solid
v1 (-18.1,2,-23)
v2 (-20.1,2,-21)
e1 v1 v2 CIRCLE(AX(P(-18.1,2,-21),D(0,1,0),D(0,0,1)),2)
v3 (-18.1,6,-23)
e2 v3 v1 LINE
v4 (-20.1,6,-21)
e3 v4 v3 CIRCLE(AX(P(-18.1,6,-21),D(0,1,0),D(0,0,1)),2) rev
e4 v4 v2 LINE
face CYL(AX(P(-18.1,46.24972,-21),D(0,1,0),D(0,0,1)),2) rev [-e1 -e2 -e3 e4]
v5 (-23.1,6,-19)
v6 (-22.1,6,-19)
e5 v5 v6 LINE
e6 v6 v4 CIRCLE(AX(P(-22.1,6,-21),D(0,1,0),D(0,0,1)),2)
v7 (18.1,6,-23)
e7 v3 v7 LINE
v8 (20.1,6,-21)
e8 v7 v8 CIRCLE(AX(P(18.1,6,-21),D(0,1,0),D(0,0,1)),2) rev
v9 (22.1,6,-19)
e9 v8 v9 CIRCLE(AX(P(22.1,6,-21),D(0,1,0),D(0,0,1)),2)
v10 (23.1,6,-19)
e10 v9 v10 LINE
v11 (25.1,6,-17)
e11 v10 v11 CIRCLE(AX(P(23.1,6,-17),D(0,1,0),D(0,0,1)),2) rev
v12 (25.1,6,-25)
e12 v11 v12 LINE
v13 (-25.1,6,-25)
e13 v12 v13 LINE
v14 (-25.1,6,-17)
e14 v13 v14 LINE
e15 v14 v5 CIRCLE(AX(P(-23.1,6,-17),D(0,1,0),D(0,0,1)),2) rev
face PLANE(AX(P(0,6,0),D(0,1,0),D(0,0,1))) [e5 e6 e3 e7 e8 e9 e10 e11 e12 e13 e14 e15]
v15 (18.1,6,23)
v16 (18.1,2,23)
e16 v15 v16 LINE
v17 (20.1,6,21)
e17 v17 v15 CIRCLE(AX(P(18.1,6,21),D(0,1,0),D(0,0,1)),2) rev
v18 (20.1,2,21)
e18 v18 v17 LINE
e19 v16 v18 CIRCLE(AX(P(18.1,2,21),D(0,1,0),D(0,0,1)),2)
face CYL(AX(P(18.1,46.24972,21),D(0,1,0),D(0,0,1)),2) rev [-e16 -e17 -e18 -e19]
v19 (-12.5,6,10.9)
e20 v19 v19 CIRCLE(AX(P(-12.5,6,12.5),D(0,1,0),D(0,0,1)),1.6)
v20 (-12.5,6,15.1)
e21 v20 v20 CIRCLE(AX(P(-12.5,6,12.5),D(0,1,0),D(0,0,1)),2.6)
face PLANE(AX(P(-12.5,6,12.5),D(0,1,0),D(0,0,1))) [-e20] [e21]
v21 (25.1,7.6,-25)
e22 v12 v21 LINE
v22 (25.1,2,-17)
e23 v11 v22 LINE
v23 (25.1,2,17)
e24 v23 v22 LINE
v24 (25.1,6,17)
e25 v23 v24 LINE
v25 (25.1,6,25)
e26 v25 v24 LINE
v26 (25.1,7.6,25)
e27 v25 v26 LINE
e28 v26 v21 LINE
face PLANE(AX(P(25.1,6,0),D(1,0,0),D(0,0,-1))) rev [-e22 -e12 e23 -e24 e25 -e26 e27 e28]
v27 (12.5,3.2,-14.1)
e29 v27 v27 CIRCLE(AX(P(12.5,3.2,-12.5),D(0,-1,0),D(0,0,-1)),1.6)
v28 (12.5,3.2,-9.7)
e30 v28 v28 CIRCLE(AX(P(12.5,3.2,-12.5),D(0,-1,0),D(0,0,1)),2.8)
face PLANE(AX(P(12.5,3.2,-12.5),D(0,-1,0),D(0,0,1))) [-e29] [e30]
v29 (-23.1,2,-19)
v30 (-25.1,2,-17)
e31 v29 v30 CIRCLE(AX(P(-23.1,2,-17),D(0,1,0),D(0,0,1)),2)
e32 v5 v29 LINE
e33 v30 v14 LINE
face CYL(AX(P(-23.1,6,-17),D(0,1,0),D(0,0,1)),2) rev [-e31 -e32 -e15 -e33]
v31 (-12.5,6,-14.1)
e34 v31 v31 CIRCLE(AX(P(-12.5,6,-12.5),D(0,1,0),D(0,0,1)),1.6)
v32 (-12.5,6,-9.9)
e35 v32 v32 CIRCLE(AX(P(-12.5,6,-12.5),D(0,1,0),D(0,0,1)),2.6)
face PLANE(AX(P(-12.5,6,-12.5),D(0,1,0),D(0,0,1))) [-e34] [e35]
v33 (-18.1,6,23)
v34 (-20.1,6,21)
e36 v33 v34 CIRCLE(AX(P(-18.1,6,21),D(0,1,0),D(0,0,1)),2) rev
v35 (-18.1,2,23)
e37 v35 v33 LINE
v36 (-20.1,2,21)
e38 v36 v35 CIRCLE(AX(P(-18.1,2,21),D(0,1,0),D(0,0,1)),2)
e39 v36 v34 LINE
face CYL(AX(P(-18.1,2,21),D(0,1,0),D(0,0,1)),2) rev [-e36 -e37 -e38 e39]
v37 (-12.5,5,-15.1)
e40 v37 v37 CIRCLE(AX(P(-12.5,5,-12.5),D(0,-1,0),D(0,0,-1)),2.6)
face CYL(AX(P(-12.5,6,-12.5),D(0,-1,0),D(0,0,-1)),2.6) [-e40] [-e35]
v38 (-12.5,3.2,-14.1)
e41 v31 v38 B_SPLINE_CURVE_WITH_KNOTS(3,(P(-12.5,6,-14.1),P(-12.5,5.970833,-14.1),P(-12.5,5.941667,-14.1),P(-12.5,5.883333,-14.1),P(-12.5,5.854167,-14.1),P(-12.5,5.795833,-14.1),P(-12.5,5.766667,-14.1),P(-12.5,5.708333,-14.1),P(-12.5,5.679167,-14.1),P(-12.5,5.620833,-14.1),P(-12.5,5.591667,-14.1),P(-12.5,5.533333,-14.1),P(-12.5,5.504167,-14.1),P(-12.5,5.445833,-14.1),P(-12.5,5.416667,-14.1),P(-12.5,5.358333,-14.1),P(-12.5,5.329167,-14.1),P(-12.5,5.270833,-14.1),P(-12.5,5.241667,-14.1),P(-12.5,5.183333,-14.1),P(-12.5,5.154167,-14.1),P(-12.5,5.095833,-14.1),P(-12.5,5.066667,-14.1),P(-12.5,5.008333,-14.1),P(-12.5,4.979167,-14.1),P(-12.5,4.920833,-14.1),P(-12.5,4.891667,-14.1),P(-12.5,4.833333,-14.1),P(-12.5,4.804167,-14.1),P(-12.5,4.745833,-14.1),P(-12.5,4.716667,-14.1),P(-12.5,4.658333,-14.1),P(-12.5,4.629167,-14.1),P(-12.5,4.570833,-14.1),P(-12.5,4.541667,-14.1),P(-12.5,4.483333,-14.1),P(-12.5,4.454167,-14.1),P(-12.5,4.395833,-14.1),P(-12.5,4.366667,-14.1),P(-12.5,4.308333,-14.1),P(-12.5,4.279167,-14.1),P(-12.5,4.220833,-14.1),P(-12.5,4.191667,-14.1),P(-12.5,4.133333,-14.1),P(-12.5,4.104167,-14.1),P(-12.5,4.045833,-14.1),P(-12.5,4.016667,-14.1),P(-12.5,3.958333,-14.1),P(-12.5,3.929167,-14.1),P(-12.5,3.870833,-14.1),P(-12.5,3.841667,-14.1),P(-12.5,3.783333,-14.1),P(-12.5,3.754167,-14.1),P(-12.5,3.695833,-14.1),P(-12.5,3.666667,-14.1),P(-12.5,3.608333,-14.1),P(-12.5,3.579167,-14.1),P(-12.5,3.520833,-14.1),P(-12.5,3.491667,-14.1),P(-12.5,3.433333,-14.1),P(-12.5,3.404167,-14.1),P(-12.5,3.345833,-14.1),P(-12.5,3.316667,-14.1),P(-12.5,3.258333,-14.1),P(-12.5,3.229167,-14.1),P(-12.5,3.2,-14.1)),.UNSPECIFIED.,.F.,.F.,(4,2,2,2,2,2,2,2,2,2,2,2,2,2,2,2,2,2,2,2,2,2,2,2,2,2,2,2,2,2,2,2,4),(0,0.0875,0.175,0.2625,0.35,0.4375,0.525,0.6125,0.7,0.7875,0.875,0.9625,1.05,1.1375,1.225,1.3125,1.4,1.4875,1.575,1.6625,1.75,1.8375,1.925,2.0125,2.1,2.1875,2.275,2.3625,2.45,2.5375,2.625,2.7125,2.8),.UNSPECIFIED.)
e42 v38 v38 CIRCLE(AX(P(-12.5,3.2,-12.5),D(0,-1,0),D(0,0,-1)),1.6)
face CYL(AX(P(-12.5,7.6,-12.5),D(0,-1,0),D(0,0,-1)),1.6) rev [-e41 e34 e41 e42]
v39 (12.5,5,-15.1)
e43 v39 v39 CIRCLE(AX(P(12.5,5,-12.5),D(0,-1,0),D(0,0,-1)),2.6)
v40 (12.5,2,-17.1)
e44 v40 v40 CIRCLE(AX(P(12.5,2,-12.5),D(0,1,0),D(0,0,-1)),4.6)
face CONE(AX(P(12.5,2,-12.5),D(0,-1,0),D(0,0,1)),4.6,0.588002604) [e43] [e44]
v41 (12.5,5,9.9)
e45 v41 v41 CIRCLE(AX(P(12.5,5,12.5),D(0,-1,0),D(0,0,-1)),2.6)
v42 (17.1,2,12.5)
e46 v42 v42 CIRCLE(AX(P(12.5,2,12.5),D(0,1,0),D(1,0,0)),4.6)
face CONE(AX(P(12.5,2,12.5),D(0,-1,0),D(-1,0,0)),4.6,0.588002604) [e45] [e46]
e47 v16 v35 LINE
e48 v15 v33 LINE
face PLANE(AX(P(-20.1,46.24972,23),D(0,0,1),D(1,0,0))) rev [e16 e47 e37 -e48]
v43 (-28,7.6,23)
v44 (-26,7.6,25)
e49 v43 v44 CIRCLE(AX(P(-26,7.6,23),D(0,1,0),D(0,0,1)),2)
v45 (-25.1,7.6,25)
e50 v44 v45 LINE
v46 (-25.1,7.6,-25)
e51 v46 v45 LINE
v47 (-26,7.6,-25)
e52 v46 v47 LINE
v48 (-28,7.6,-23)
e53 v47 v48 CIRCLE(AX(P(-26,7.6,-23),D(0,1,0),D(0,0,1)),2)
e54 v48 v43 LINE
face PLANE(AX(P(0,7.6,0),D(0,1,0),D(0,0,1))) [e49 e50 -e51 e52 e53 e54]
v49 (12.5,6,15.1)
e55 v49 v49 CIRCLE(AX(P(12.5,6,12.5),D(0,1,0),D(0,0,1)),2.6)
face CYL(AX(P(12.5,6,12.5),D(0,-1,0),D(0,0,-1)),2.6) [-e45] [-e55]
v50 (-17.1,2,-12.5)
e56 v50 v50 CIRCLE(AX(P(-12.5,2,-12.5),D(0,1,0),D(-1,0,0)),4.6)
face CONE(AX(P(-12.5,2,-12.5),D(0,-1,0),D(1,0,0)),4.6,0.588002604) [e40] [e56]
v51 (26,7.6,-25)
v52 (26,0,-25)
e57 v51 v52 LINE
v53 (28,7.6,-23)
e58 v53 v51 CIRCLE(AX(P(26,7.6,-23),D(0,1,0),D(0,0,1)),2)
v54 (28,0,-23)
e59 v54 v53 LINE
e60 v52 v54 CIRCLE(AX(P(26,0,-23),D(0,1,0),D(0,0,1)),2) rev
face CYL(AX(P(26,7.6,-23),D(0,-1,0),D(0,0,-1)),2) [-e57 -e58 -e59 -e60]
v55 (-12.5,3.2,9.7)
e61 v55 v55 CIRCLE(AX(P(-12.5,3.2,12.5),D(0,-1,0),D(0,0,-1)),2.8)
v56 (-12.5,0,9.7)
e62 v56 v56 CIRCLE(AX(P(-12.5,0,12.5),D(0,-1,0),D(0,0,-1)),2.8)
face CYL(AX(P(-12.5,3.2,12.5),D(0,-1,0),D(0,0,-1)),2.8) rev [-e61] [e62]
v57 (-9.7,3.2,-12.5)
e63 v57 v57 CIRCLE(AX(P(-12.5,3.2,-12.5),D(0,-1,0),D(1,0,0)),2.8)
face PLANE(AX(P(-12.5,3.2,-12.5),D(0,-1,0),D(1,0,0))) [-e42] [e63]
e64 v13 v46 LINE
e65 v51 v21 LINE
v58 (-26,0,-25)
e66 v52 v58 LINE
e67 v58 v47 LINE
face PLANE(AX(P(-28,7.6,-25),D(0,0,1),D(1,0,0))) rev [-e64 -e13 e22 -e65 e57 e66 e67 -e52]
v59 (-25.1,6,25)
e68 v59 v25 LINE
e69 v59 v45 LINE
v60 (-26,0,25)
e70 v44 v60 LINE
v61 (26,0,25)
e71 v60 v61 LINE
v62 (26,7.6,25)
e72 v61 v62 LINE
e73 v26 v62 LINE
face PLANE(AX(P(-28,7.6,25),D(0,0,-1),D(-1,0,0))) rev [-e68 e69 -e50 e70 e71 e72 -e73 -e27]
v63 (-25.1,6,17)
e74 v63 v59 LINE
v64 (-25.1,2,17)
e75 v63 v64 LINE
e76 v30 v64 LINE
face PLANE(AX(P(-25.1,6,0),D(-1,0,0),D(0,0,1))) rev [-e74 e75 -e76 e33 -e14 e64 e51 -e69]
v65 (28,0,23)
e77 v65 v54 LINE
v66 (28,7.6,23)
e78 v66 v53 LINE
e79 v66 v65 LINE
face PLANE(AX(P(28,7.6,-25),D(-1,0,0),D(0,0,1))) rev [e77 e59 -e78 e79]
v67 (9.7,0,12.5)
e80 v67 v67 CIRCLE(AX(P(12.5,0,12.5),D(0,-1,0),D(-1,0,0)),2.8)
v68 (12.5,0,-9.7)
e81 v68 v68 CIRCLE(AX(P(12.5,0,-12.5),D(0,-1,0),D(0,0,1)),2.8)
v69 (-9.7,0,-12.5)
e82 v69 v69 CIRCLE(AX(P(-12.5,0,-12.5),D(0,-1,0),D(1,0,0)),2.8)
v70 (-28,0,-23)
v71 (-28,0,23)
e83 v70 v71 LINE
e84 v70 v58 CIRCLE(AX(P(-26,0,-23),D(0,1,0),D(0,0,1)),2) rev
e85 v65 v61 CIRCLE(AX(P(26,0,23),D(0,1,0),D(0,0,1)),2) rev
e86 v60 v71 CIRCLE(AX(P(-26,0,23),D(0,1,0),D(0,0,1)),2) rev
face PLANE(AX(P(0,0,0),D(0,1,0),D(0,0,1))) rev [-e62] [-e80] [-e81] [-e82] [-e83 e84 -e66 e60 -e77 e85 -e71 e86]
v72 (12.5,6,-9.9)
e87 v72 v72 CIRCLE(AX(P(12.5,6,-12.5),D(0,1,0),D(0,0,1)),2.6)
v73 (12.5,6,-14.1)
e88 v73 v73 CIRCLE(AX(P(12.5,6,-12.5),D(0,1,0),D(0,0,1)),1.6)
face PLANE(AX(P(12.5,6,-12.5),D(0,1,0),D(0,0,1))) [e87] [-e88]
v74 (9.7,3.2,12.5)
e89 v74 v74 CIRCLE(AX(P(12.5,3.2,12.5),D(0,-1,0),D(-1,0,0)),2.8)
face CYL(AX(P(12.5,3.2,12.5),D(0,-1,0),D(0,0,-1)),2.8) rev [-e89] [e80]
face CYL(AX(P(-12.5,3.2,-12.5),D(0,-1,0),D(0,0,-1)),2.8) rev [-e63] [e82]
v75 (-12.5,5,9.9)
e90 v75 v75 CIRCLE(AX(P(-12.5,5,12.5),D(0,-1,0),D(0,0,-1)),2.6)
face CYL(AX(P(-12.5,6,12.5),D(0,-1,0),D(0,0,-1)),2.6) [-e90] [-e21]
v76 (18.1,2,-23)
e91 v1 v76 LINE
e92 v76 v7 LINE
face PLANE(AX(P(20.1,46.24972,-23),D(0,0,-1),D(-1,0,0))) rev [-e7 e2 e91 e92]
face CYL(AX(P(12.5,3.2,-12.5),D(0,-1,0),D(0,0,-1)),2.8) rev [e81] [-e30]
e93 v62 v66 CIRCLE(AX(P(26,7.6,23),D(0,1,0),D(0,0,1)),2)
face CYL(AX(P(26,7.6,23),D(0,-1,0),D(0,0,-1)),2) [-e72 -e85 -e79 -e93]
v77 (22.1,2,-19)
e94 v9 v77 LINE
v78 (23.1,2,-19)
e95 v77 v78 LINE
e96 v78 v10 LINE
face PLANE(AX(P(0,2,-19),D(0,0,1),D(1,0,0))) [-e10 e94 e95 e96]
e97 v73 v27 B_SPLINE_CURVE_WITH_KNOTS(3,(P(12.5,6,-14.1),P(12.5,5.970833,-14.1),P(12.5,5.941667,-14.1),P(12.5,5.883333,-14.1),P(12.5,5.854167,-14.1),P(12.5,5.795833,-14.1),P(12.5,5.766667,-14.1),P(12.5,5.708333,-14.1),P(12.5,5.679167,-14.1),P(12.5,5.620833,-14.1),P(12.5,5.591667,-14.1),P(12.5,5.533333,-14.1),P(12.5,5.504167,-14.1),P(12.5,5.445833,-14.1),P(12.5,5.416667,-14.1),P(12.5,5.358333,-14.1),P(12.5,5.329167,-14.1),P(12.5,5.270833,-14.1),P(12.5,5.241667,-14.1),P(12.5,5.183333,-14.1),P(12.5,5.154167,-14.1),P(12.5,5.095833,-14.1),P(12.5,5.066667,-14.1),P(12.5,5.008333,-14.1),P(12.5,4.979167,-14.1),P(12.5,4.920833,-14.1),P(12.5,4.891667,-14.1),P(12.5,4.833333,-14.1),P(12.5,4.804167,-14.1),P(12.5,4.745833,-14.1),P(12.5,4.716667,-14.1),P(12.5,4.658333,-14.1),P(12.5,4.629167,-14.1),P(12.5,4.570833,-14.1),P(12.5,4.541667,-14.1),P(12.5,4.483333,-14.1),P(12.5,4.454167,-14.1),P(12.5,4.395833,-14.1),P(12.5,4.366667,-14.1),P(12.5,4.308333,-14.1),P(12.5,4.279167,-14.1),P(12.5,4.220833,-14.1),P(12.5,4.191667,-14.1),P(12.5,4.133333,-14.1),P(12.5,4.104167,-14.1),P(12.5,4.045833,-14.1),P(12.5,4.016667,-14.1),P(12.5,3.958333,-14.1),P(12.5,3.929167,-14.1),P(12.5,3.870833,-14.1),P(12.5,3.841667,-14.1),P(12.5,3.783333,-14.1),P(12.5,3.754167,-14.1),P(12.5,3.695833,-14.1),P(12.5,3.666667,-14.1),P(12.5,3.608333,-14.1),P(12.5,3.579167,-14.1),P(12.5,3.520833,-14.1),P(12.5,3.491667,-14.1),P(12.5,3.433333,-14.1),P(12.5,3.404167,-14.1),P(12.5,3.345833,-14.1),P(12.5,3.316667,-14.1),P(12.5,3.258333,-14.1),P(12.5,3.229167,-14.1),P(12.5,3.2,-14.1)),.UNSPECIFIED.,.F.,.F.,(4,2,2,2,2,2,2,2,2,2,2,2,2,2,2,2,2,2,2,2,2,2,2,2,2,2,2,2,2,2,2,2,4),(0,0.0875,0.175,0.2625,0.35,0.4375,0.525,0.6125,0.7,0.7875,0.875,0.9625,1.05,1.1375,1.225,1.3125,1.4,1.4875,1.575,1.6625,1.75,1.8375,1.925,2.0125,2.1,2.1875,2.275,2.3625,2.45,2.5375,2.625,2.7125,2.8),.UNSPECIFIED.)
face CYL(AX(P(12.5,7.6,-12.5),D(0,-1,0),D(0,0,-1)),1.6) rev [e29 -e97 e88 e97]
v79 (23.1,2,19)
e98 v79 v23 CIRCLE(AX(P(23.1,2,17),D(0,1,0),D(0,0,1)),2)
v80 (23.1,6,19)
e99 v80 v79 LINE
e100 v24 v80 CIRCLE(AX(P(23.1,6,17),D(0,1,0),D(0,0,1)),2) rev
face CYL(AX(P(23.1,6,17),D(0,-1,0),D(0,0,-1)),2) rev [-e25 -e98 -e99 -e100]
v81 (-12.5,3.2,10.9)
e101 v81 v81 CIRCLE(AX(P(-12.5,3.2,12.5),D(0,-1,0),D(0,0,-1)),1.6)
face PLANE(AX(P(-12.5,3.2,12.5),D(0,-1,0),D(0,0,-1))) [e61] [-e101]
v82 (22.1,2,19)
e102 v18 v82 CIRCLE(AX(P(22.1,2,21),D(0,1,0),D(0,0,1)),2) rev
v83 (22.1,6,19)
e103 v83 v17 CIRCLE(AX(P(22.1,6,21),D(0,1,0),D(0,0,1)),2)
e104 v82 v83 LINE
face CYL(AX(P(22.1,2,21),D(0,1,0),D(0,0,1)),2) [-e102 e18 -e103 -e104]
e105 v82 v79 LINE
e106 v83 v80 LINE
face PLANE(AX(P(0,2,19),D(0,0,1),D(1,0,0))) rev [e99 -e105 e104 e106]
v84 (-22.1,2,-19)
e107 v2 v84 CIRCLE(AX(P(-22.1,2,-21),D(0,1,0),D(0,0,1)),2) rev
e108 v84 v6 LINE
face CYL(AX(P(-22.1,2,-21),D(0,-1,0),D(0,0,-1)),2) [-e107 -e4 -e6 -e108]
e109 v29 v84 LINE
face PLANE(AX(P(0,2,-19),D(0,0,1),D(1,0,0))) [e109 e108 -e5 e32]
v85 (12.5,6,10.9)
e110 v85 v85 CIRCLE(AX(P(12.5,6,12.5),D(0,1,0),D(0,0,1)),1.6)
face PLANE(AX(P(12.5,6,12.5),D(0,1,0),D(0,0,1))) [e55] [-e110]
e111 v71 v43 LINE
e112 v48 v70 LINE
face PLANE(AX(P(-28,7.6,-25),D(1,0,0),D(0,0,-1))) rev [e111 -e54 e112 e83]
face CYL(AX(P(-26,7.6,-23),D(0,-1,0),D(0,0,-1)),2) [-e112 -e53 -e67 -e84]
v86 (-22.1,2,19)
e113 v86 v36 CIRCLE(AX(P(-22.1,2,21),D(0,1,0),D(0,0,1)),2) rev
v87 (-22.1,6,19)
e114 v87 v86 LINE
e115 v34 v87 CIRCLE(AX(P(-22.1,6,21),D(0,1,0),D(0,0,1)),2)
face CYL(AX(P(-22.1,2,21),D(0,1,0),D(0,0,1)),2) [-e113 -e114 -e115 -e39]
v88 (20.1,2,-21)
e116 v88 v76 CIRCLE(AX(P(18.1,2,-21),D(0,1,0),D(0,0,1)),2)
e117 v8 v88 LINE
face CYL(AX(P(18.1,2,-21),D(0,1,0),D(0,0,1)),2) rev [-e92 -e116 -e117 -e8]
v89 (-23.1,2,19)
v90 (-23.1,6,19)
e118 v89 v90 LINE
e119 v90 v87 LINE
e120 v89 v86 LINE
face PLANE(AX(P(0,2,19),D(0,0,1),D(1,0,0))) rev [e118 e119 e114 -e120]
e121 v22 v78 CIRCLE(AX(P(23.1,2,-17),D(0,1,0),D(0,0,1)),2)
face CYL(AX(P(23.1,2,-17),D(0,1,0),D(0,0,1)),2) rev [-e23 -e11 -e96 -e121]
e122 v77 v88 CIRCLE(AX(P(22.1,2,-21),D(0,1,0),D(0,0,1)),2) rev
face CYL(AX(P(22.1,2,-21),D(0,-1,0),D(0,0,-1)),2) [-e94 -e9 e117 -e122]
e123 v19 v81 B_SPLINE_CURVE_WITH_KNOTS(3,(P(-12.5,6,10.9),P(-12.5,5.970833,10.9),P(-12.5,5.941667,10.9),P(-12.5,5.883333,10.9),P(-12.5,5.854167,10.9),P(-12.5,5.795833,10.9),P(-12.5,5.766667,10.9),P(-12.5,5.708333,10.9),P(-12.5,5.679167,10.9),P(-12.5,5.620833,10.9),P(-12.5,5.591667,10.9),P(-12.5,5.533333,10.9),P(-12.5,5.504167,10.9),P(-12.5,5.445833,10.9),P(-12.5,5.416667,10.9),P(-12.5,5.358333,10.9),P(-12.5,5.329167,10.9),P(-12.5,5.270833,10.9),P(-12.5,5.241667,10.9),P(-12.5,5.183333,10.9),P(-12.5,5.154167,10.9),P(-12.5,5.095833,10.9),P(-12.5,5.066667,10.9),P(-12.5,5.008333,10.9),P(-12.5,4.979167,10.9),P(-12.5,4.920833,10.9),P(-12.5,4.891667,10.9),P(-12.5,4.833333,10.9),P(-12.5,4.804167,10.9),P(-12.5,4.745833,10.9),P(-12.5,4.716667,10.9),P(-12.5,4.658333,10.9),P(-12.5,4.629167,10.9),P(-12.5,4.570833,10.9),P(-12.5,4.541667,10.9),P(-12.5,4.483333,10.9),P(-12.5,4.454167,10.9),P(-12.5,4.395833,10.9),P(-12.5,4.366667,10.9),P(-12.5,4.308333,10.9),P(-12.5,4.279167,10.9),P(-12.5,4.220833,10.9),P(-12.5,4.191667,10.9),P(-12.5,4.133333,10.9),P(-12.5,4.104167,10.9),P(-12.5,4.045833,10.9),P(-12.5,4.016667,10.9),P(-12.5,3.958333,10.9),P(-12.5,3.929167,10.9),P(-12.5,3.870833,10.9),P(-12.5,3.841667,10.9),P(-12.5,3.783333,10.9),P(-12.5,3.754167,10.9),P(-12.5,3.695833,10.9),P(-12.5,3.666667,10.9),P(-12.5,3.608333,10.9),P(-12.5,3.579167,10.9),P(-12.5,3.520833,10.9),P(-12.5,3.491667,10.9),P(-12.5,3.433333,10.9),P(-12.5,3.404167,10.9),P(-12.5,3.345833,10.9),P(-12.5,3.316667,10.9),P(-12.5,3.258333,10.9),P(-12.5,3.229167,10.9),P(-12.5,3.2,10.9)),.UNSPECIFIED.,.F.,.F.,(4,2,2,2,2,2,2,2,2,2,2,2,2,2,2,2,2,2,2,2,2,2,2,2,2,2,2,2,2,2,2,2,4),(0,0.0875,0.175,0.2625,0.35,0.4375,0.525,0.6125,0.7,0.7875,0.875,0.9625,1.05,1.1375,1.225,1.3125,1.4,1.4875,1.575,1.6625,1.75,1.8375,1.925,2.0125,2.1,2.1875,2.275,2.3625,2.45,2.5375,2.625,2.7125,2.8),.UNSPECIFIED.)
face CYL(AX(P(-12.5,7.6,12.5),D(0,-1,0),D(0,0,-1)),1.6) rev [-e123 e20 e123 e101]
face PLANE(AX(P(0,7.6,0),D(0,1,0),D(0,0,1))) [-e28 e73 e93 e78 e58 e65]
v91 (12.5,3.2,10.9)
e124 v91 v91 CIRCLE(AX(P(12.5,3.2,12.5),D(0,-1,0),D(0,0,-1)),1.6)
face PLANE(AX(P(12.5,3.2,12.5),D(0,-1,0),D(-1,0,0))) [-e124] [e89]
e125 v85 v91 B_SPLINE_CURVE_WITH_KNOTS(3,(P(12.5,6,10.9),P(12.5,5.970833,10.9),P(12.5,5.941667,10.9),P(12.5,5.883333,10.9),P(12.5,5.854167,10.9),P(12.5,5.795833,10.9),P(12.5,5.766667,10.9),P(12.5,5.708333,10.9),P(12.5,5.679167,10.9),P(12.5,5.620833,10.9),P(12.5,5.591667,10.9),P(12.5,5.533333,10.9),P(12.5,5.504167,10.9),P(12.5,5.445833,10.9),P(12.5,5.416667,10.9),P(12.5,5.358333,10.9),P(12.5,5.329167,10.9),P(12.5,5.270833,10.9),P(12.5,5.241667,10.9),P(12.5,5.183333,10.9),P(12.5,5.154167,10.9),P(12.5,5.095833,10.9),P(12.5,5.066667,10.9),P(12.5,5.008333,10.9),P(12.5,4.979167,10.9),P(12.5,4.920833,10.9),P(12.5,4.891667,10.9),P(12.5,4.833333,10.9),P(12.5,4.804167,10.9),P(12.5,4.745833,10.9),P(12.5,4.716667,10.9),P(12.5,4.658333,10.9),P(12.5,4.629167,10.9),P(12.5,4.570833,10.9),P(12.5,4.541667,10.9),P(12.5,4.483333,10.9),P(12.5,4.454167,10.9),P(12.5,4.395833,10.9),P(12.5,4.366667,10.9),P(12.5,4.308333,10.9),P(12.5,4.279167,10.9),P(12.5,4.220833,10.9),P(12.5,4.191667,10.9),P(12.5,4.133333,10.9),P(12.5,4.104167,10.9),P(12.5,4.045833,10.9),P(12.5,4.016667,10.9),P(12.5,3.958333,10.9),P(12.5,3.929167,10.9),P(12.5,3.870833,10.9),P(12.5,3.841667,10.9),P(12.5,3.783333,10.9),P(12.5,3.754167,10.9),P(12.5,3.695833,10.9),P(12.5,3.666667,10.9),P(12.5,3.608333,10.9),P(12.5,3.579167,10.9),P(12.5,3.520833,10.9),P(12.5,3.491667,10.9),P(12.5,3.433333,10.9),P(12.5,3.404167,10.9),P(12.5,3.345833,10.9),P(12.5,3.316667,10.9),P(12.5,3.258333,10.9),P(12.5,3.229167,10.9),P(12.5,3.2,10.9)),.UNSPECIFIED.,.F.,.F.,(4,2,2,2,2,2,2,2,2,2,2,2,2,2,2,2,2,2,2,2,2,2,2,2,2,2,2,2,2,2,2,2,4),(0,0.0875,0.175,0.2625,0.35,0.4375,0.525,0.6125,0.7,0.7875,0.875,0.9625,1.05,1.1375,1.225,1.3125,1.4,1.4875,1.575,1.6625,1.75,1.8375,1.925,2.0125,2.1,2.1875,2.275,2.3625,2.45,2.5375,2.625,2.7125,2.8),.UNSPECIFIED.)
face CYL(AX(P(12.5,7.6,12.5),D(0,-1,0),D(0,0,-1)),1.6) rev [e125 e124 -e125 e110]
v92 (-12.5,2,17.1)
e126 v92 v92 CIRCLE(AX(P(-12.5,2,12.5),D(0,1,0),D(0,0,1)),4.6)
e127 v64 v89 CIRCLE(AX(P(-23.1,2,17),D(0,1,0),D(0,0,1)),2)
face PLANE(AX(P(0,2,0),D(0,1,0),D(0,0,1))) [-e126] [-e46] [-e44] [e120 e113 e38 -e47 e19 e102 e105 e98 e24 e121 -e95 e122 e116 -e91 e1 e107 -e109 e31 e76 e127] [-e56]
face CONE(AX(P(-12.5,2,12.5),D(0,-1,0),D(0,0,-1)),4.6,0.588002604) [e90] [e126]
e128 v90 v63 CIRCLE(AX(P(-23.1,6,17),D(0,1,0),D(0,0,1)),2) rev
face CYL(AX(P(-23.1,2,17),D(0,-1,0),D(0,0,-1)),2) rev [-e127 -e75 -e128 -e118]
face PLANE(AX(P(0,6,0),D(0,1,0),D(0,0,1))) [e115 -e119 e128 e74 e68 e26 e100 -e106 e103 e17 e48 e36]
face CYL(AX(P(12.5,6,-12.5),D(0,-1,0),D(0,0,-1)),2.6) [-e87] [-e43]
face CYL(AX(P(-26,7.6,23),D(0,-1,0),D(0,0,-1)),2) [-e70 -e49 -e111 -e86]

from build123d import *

# Parameters (mm, degrees)
SKETCH_1_W               = 56
SKETCH_1_H               = 50
SKETCH_1_R               = 1.6
EXTRUDE_1_DEPTH          = 7.6
CUT_EXTRUDE_START        = -1.6
SKETCH_2_W               = 50.2
SKETCH_2_H               = 50
SKETCH_2_R               = 1.6
CUT_EXTRUDE_1_DEPTH      = 1.6
CUT_EXTRUDE_START_2      = -4
SKETCH_3_W               = 40.2
SKETCH_3_H               = 38
SKETCH_3_R               = 1.6
SKETCH_3_H_2             = 6
SKETCH_3_W_2             = 5
CUT_EXTRUDE_2_DEPTH      = 4
SKETCH_4_R               = 2.6
SKETCH_4_R_2             = 1.6
EXTRUDE_2_DEPTH          = 4
SKETCH_6_W               = 40.2
SKETCH_6_H               = 2
EXTRUDE_3_DEPTH          = 4
FILLET_2_R               = 2
SKETCH_7_R               = 2.8
CUT_EXTRUDE_3_DEPTH      = 3.2
PATTERN_CIRCULAR_2_COUNT = 4


with BuildPart() as part:
    # 草图1 → 凸台-拉伸1 (new body)
    with BuildSketch(Plane(origin=(0, 0, 0), x_dir=(1, 0, 0), z_dir=(0, 1, 0))):
        Rectangle(SKETCH_1_W, SKETCH_1_H)
        with Locations(Location((-12.5, 12.5, 0), (0, 0, 90))):
            Circle(SKETCH_1_R, mode=Mode.SUBTRACT)
        with Locations(Location((12.5, 12.5, 0), (0, 0, 90))):
            Circle(SKETCH_1_R, mode=Mode.SUBTRACT)
        with Locations(Location((12.5, -12.5, 0), (0, 0, 90))):
            Circle(SKETCH_1_R, mode=Mode.SUBTRACT)
        with Locations(Location((-12.5, -12.5, 0), (0, 0, 90))):
            Circle(SKETCH_1_R, mode=Mode.SUBTRACT)
    extrude(amount=EXTRUDE_1_DEPTH)

    # 草图2 → 切除-拉伸1 (cut)
    with BuildSketch(Plane(origin=(0, 7.6, 0), x_dir=(1, 0, 0), z_dir=(0, 1, 0)).offset(CUT_EXTRUDE_START)):
        Rectangle(SKETCH_2_W, SKETCH_2_H)
        with Locations(Location((-12.5, -12.5, 0), (0, 0, 90))):
            Circle(SKETCH_2_R, mode=Mode.SUBTRACT)
        with Locations(Location((12.5, -12.5, 0), (0, 0, 90))):
            Circle(SKETCH_2_R, mode=Mode.SUBTRACT)
        with Locations(Location((-12.5, 12.5, 0), (0, 0, 90))):
            Circle(SKETCH_2_R, mode=Mode.SUBTRACT)
        with Locations(Location((12.5, 12.5, 0), (0, 0, 90))):
            Circle(SKETCH_2_R, mode=Mode.SUBTRACT)
    extrude(amount=CUT_EXTRUDE_1_DEPTH, mode=Mode.SUBTRACT)

    # 草图3 → 切除-拉伸2 (cut)
    # profile 1 of 5: a face of its own
    with BuildSketch(Plane(origin=(0, 6, 0), x_dir=(1, 0, 0), z_dir=(0, 1, 0)).offset(CUT_EXTRUDE_START_2)):
        Rectangle(SKETCH_3_W, SKETCH_3_H)
        with Locations(Location((-12.5, -12.5, 0), (0, 0, 90))):
            Circle(SKETCH_3_R, mode=Mode.SUBTRACT)
        with Locations(Location((12.5, -12.5, 0), (0, 0, 90))):
            Circle(SKETCH_3_R, mode=Mode.SUBTRACT)
        with Locations(Location((-12.5, 12.5, 0), (0, 0, 90))):
            Circle(SKETCH_3_R, mode=Mode.SUBTRACT)
        with Locations(Location((12.5, 12.5, 0), (0, 0, 90))):
            Circle(SKETCH_3_R, mode=Mode.SUBTRACT)
    # profile 2 of 5: a face of its own
    with BuildSketch(Plane(origin=(0, 6, 0), x_dir=(1, 0, 0), z_dir=(0, 1, 0)).offset(CUT_EXTRUDE_START_2)):
        with Locations((0, 22)):
            Rectangle(SKETCH_3_W, SKETCH_3_H_2)
    # profile 3 of 5: a face of its own
    with BuildSketch(Plane(origin=(0, 6, 0), x_dir=(1, 0, 0), z_dir=(0, 1, 0)).offset(CUT_EXTRUDE_START_2)):
        with Locations((22.6, 0)):
            Rectangle(SKETCH_3_W_2, SKETCH_3_H)
    # profile 4 of 5: a face of its own
    with BuildSketch(Plane(origin=(0, 6, 0), x_dir=(1, 0, 0), z_dir=(0, 1, 0)).offset(CUT_EXTRUDE_START_2)):
        with Locations((-22.6, 0)):
            Rectangle(SKETCH_3_W_2, SKETCH_3_H)
    # profile 5 of 5: a face of its own
    with BuildSketch(Plane(origin=(0, 6, 0), x_dir=(1, 0, 0), z_dir=(0, 1, 0)).offset(CUT_EXTRUDE_START_2)):
        with Locations((0, -22)):
            Rectangle(SKETCH_3_W, SKETCH_3_H_2)
    extrude(amount=CUT_EXTRUDE_2_DEPTH, mode=Mode.SUBTRACT)

    # 草图4 → 凸台-拉伸2 (add)
    # profile 1 of 4: a face of its own
    with BuildSketch(Plane(origin=(0, 2, 0), x_dir=(1, 0, 0), z_dir=(0, 1, 0))):
        with Locations(Location((-12.5, 12.5, 0), (0, 0, 270))):
            Circle(SKETCH_4_R)
        with Locations(Location((-12.5, 12.5, 0), (0, 0, 90))):
            Circle(SKETCH_4_R_2, mode=Mode.SUBTRACT)
    # profile 2 of 4: a face of its own
    with BuildSketch(Plane(origin=(0, 2, 0), x_dir=(1, 0, 0), z_dir=(0, 1, 0))):
        with Locations(Location((12.5, 12.5, 0), (0, 0, 270))):
            Circle(SKETCH_4_R)
        with Locations(Location((12.5, 12.5, 0), (0, 0, 90))):
            Circle(SKETCH_4_R_2, mode=Mode.SUBTRACT)
    # profile 3 of 4: a face of its own
    with BuildSketch(Plane(origin=(0, 2, 0), x_dir=(1, 0, 0), z_dir=(0, 1, 0))):
        with Locations(Location((12.5, -12.5, 0), (0, 0, 270))):
            Circle(SKETCH_4_R)
        with Locations(Location((12.5, -12.5, 0), (0, 0, 90))):
            Circle(SKETCH_4_R_2, mode=Mode.SUBTRACT)
    # profile 4 of 4: a face of its own
    with BuildSketch(Plane(origin=(0, 2, 0), x_dir=(1, 0, 0), z_dir=(0, 1, 0))):
        with Locations(Location((-12.5, -12.5, 0), (0, 0, 270))):
            Circle(SKETCH_4_R)
        with Locations(Location((-12.5, -12.5, 0), (0, 0, 90))):
            Circle(SKETCH_4_R_2, mode=Mode.SUBTRACT)
    extrude(amount=EXTRUDE_2_DEPTH)

    # 草图6 → 凸台-拉伸3 (add)
    with BuildSketch(Plane(origin=(0, 2, 0), x_dir=(1, 0, 0), z_dir=(0, 1, 0))):
        with Locations((0, -24)):
            Rectangle(SKETCH_6_W, SKETCH_6_H)
        with Locations((0, 24)):
            Rectangle(SKETCH_6_W, SKETCH_6_H)
    extrude(amount=EXTRUDE_3_DEPTH)

    # 圆角2
    fillet_2_edges = [part.edges().sort_by_distance(p)[0] for p in [
        (25.1, 4, 19),
        (20.1, 4, 19),
        (20.1, 4, 23),
        (-28, 3.8, -25),
        (-28, 3.8, 25),
        (28, 3.8, 25),
        (28, 3.8, -25),
        (-20.1, 4, 23),
        (-25.1, 4, 19),
        (-20.1, 4, 19),
        (25.1, 4, -19),
        (20.1, 4, -19),
        (20.1, 4, -23),
        (-20.1, 4, -23),
        (-20.1, 4, -19),
        (-25.1, 4, -19),
    ]]
    fillet(fillet_2_edges, radius=FILLET_2_R - 0.0001)  # a hair under: the kernel refuses the full size

    # 草图5 → 旋转1 (revolve)
    with BuildSketch(Plane.XY.offset(12.5), mode=Mode.PRIVATE) as revolve_1_sk:
        Polygon((-9.9, 5), (-7.9, 2), (-9.9, 2), align=None)
    revolve_1 = revolve(revolve_1_sk.sketch.rotate(Axis((-12.5, 6, 12.5), (0, -1, 0)), 270), axis=Axis((-12.5, 6, 12.5), (0, -1, 0)))

    # 草图7 → 切除-拉伸3 (cut)
    with BuildSketch(Plane.XZ):
        with Locations(Location((-12.5, 12.5, 0), (0, 0, 270))):
            Circle(SKETCH_7_R)
    cut_extrude_3 = extrude(amount=-CUT_EXTRUDE_3_DEPTH, mode=Mode.SUBTRACT)

    # 阵列(圆周)2: 旋转1, 切除-拉伸3 ×4 about axis
    pattern_circular_2_axis = Axis((0, 0, 0), (0, 1, 0))
    add([revolve_1.rotate(pattern_circular_2_axis, i * 360 / PATTERN_CIRCULAR_2_COUNT) for i in range(1, PATTERN_CIRCULAR_2_COUNT)])
    add([cut_extrude_3.rotate(pattern_circular_2_axis, i * 360 / PATTERN_CIRCULAR_2_COUNT) for i in range(1, PATTERN_CIRCULAR_2_COUNT)], mode=Mode.SUBTRACT)


solid = part.part
